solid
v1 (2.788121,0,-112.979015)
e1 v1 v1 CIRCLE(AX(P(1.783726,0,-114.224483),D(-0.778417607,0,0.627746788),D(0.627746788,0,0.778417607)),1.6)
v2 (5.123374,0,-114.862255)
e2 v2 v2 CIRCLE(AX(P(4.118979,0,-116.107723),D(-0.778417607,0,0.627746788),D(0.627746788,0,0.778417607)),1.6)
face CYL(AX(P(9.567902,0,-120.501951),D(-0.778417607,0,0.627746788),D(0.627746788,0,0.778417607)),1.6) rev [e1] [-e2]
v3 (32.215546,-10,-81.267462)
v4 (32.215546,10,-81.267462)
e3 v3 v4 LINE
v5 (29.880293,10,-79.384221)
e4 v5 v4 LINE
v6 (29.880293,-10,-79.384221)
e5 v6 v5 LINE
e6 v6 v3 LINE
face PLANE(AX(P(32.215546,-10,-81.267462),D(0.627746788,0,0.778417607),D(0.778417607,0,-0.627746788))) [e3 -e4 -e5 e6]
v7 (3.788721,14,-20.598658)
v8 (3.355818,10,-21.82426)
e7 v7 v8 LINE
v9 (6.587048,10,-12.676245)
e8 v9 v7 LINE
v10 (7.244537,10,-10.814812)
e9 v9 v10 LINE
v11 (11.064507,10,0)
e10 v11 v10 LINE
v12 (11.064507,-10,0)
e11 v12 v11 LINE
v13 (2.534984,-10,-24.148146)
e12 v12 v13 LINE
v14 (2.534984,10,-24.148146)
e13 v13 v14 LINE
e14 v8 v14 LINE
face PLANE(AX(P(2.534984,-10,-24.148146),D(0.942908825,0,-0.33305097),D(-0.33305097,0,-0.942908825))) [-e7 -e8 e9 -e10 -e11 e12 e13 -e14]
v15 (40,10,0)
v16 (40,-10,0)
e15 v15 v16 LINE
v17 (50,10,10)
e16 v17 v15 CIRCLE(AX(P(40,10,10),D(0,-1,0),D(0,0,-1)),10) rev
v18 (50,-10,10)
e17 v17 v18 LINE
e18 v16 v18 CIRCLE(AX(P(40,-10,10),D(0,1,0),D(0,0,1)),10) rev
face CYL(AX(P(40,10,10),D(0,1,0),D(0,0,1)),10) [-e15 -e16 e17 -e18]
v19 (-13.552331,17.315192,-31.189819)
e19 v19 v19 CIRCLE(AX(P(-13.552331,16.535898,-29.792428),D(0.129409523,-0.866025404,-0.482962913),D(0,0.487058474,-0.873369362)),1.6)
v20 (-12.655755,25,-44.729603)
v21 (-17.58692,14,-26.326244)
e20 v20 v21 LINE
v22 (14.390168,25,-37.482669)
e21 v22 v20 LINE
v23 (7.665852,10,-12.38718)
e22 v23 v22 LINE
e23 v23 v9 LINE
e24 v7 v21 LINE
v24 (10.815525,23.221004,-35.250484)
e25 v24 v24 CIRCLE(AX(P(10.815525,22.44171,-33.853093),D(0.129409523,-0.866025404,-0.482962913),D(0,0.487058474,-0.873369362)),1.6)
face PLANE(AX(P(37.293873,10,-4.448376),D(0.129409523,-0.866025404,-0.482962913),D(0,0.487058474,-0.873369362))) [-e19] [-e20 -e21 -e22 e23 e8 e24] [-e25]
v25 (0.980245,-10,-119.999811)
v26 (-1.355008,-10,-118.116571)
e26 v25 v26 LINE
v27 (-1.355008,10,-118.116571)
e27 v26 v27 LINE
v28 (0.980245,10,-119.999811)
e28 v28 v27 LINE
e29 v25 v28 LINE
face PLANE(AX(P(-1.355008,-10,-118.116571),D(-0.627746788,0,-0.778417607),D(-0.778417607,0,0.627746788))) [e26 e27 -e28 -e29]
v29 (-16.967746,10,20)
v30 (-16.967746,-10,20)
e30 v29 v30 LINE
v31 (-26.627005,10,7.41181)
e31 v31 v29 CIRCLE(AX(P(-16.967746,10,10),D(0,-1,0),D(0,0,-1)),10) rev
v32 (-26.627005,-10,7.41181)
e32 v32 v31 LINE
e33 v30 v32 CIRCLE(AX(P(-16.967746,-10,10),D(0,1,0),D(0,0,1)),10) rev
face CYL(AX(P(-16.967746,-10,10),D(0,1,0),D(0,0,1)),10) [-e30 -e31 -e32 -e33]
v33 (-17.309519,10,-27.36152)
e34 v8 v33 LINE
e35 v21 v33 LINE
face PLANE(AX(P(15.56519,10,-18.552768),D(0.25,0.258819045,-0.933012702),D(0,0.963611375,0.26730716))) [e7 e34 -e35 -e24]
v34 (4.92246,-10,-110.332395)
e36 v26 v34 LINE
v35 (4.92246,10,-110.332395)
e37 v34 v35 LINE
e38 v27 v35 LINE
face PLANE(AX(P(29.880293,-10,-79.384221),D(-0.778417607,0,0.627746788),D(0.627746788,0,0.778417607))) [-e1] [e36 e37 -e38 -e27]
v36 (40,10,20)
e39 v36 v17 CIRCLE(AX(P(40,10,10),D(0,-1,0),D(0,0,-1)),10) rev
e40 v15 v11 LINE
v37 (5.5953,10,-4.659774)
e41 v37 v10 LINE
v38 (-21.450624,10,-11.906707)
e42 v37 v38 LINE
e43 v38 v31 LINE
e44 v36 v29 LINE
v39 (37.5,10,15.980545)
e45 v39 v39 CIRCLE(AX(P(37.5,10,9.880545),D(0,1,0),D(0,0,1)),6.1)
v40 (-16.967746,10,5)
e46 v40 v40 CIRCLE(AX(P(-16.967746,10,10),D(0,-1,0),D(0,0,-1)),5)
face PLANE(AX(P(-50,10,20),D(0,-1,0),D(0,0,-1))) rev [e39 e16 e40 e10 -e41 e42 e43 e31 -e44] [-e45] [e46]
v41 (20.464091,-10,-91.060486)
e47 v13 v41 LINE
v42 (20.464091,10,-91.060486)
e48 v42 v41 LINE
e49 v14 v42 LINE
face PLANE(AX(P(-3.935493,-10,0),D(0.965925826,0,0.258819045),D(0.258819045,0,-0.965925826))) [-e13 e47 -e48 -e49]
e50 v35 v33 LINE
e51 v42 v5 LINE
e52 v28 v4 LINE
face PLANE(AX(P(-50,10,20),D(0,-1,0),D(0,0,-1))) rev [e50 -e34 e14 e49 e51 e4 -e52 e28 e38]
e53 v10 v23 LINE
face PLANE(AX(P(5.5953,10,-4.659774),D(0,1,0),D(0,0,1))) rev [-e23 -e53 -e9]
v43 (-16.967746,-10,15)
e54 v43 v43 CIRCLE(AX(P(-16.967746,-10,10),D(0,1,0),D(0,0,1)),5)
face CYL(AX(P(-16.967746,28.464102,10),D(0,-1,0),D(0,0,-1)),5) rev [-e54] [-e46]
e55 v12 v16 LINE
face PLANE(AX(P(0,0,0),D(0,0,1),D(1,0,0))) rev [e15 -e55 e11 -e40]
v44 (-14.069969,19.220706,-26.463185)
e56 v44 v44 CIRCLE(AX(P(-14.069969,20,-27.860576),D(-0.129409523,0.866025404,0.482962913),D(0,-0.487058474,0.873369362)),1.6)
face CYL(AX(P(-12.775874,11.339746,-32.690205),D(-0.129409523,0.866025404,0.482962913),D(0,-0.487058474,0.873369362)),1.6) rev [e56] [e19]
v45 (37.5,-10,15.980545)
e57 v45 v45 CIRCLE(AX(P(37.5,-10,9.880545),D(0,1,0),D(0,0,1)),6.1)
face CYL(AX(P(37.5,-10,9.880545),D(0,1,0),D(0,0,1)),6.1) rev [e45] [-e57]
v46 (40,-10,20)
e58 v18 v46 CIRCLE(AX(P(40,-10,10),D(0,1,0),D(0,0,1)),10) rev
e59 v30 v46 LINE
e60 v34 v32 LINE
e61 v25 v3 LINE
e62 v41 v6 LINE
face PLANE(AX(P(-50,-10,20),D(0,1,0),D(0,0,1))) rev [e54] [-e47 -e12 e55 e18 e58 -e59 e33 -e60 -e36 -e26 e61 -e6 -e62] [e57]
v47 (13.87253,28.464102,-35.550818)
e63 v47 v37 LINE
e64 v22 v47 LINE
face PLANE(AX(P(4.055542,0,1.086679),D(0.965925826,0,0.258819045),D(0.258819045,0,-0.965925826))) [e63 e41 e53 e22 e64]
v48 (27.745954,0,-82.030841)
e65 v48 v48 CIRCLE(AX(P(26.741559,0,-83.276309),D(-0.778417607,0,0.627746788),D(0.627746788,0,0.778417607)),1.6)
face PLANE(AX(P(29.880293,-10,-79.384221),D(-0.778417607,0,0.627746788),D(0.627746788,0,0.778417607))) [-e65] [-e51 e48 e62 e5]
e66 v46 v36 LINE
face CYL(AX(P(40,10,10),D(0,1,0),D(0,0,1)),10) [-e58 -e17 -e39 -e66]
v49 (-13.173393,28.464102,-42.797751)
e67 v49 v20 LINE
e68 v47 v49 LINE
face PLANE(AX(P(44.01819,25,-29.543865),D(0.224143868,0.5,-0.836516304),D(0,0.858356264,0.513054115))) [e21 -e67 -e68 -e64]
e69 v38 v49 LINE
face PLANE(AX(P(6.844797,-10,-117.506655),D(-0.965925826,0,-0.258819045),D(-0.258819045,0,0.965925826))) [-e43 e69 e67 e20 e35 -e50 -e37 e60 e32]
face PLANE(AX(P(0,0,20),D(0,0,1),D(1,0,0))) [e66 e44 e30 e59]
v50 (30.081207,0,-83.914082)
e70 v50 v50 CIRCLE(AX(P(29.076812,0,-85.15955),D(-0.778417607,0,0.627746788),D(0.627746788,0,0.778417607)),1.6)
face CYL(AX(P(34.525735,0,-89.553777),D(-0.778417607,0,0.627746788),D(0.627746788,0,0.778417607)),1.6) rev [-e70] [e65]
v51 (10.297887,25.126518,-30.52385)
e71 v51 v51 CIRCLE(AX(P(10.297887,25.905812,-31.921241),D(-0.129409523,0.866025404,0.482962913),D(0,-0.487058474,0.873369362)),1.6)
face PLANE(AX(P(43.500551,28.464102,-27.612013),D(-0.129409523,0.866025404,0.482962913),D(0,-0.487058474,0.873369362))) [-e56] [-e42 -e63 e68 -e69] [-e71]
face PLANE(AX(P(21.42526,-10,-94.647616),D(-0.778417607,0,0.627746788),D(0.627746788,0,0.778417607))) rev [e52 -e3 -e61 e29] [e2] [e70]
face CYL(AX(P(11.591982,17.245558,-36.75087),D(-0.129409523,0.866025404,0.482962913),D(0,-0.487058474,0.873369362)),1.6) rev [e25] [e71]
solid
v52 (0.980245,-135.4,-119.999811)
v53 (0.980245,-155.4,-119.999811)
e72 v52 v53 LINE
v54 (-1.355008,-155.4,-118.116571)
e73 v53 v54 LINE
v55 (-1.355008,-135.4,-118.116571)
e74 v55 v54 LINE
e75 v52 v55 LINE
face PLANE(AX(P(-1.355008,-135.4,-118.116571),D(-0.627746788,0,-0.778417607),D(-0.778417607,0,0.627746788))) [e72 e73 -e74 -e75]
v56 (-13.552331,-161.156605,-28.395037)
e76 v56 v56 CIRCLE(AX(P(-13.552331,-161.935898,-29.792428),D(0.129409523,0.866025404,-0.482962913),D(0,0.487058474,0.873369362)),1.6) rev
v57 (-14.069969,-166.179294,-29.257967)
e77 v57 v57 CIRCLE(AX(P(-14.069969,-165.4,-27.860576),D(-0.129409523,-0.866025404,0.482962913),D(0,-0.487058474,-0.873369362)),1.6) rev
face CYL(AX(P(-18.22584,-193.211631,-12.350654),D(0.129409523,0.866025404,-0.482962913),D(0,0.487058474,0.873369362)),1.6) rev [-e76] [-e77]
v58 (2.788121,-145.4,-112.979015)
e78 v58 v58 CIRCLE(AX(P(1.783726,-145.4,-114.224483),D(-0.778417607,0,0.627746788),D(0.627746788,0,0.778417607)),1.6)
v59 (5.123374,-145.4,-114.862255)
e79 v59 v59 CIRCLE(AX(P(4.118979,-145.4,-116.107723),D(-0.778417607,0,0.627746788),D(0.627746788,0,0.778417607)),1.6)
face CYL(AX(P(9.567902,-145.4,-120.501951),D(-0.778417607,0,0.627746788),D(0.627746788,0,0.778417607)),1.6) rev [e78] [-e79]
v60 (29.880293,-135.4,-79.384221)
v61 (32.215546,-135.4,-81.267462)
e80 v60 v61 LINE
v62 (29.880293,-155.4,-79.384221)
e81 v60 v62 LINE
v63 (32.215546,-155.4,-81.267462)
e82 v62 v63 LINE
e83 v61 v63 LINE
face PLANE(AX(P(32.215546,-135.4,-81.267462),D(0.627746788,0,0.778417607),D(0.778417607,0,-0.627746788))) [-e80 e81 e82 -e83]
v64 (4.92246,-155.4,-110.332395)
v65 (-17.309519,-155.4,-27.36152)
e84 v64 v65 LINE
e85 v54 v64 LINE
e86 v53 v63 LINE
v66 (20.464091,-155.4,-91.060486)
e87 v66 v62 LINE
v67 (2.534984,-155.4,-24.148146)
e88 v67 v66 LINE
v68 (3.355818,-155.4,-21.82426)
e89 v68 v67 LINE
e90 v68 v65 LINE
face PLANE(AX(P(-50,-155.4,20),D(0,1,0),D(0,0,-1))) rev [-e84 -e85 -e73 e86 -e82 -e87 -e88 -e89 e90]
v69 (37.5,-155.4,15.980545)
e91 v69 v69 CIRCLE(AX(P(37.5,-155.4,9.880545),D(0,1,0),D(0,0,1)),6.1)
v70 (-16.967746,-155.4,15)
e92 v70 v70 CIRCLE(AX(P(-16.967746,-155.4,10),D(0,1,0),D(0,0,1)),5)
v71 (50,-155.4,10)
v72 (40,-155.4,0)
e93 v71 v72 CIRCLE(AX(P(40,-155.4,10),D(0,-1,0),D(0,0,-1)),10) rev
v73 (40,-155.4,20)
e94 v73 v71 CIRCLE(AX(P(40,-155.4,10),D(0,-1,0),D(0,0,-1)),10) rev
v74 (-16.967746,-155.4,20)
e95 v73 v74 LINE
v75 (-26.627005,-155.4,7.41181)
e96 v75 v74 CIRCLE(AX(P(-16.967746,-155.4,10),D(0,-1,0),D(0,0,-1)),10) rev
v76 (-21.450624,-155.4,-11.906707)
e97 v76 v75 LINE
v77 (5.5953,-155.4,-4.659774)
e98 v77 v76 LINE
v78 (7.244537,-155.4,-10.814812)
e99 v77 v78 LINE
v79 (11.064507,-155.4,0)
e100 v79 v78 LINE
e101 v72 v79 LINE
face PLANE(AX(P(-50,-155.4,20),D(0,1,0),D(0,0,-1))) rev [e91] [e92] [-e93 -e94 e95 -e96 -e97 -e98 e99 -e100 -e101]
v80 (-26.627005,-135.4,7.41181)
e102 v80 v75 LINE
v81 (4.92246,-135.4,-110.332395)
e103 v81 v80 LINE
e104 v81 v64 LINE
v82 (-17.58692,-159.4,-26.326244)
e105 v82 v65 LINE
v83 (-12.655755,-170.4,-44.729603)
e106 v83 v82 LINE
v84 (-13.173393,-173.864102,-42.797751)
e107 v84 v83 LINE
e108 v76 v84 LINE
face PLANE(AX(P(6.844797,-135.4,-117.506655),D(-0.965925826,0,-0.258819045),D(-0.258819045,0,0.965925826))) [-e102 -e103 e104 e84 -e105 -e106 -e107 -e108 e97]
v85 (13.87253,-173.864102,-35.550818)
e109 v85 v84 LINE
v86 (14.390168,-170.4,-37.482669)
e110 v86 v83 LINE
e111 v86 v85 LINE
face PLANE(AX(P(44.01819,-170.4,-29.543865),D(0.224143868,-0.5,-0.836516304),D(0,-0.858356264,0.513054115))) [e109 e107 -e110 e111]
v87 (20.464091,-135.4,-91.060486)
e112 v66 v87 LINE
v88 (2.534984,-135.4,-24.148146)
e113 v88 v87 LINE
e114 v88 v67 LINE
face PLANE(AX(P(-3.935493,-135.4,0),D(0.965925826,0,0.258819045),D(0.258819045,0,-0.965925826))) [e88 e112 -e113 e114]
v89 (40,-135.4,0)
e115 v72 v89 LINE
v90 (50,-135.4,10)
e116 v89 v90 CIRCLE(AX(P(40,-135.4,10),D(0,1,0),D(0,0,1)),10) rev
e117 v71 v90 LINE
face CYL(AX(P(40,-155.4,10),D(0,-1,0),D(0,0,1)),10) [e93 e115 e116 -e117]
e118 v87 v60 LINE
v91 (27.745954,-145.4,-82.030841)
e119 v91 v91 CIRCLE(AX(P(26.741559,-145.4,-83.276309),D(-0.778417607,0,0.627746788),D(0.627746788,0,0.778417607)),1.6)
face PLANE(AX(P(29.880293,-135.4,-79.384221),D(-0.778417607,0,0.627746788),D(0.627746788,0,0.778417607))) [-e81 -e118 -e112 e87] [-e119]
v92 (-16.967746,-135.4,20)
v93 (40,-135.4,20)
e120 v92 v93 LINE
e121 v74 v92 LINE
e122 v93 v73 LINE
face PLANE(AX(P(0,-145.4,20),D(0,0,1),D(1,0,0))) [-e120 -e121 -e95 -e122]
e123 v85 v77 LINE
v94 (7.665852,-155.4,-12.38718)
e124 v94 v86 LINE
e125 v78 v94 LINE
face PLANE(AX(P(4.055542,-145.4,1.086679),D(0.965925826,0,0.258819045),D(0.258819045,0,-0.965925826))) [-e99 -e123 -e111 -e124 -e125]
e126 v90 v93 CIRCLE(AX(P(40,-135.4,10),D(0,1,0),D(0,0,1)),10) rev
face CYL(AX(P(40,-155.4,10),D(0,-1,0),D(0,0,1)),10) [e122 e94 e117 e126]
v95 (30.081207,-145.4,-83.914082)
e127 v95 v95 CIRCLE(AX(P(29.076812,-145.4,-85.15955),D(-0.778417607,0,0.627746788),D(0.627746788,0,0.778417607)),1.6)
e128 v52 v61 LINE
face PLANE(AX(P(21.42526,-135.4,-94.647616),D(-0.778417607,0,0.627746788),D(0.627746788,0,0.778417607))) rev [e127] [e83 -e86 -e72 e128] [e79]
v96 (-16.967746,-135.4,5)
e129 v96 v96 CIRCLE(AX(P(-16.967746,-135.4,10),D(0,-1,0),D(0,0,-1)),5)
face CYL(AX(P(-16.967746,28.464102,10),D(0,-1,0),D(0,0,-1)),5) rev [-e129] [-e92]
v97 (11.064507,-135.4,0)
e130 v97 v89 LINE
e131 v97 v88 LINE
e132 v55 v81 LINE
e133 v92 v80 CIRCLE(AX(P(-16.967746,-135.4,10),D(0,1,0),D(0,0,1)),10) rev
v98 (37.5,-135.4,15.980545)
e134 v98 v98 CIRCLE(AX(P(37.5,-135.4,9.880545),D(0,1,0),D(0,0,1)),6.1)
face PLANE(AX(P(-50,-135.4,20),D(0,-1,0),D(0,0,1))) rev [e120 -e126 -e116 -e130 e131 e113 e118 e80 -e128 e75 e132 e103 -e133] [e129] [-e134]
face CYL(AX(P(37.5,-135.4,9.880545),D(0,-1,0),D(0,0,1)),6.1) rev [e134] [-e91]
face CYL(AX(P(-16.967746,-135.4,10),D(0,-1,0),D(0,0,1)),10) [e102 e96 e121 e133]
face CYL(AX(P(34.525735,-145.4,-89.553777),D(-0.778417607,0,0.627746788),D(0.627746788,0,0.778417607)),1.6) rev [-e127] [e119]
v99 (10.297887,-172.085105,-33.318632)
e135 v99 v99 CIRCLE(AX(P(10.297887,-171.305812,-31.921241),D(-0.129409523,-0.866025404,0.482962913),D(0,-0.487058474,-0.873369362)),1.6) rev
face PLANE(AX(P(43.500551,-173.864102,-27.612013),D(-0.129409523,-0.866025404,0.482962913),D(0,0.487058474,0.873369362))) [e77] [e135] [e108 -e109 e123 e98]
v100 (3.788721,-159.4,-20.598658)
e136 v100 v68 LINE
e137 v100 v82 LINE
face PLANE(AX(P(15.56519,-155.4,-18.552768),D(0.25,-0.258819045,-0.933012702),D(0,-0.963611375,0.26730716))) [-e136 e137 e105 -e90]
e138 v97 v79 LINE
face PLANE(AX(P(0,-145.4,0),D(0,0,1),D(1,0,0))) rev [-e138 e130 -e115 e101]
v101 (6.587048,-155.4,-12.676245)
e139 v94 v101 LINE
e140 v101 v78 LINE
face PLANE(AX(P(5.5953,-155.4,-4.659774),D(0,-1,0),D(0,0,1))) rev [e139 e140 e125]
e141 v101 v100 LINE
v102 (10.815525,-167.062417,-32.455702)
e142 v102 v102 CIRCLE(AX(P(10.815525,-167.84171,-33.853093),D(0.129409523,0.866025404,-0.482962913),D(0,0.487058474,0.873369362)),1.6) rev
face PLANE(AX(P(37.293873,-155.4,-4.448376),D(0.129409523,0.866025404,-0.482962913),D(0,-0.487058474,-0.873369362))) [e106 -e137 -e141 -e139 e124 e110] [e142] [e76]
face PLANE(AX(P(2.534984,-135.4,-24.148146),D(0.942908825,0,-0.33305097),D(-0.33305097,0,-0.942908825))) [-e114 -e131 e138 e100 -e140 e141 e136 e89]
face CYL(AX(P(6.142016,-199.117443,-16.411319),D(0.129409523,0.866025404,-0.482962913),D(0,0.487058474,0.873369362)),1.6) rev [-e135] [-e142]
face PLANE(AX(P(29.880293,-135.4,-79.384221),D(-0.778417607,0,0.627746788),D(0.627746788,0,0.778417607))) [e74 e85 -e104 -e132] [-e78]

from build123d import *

# Parameters (mm, degrees)
SKETCH_1_W               = 100
SKETCH_1_H               = 20
EXTRUDE_1_DEPTH          = 20
SKETCH_2_R               = 6.1
CUT_EXTRUDE_1_DEPTH      = 58.445626465
FILLET_1_R               = 10
FILLET_2_R               = 10
SKETCH_4_W               = 20
SKETCH_4_H               = 20
CUT_EXTRUDE_2_DEPTH      = 20
EXTRUDE_2_DEPTH          = 20
CUT_EXTRUDE_3_DEPTH      = 130.258709652
CUT_EXTRUDE_4_DEPTH      = 130.258709652
EXTRUDE_3_DEPTH          = 20
EXTRUDE_4_DEPTH          = 20
FILLET_3_R               = 10
EXTRUDE_5_DEPTH          = 20
EXTRUDE_6_DEPTH          = 8
EXTRUDE_7_REACH          = 140.193
CUT_EXTRUDE_5_DEPTH      = 210.16834973
CUT_EXTRUDE_5_DEPTH_BACK = 210.16834973
SKETCH_15_R              = 5
CUT_EXTRUDE_6_DEPTH      = 242.818562796
CUT_EXTRUDE_6_DEPTH_BACK = 10
SKETCH_16_R              = 1.6
SKETCH_18_R              = 1.6
CUT_EXTRUDE_7_DEPTH      = 10
SKETCH_19_R              = 1.6
CUT_EXTRUDE_8_DEPTH      = 10
SKETCH_20_R              = 1.6
CUT_EXTRUDE_9_DEPTH      = 10


with BuildPart() as part:
    # 草图1 → 凸台-拉伸1 (new body)
    with BuildSketch(Plane.XY):
        Rectangle(SKETCH_1_W, SKETCH_1_H)
    extrude(amount=EXTRUDE_1_DEPTH)

    # 草图2 → 切除-拉伸1 (cut, through all)
    with BuildSketch(Plane(origin=(0, 10, 0), x_dir=(1, 0, 0), z_dir=(0, 1, 0))):
        with Locations(Location((37.5, -9.880544607, 0), (0, 0, 270))):
            Circle(SKETCH_2_R)
    extrude(amount=-CUT_EXTRUDE_1_DEPTH, mode=Mode.SUBTRACT)

    # 圆角1
    fillet_1_edges = [part.edges().sort_by_distance(p)[0] for p in [
        (50, 0, 20),
    ]]
    fillet(fillet_1_edges, radius=FILLET_1_R)

    # 圆角2
    fillet_2_edges = [part.edges().sort_by_distance(p)[0] for p in [
        (50, 0, 0),
    ]]
    fillet(fillet_2_edges, radius=FILLET_2_R - 0.0001)  # a hair under: the kernel refuses the full size

    # 草图4 → 切除-拉伸2 (cut)
    with BuildSketch(Plane.ZY.offset(50)):
        with Locations((10, 0)):
            Rectangle(SKETCH_4_W, SKETCH_4_H)
    extrude(amount=-CUT_EXTRUDE_2_DEPTH, mode=Mode.SUBTRACT)

    # 草图6 → 凸台-拉伸2 (add)
    with BuildSketch(Plane(origin=(0, 10, 0), x_dir=(1, 0, 0), z_dir=(0, 1, 0))):
        Polygon((-3.935492543, 0), (22.386428262, 98.234745796), (6.84479722, 117.50665522), (-30, -20), align=None)
    extrude(amount=-EXTRUDE_2_DEPTH)

    # 草图7 → 切除-拉伸3 (cut, through all)
    with BuildSketch(Plane(origin=(0, 10, 0), x_dir=(1, 0, 0), z_dir=(0, 1, 0))):
        Polygon((-24.641016151, 0), (-30, -20), (-30, 0), align=None)
    extrude(amount=-CUT_EXTRUDE_3_DEPTH, mode=Mode.SUBTRACT)

    # 草图9 → 切除-拉伸4 (cut, through all)
    with BuildSketch(Plane(origin=(0, 10, 0), x_dir=(1, 0, 0), z_dir=(0, 1, 0))):
        Polygon((6.84479722, 117.50665522), (22.386428262, 98.234745796), (21.425259639, 94.64761566), (5.883628597, 113.919525084), align=None)
    extrude(amount=-CUT_EXTRUDE_4_DEPTH, mode=Mode.SUBTRACT)

    # 草图10 → 凸台-拉伸3 (add, through all)
    with BuildSketch(Plane(origin=(0, 10, 0), x_dir=(1, 0, 0), z_dir=(0, 1, 0))):
        Polygon((11.064507457, 0), (-3.935492543, 0), (2.534983584, 24.148145657), align=None)
    extrude(amount=-EXTRUDE_3_DEPTH)

    # 草图11 → 凸台-拉伸4 (add, through all)
    with BuildSketch(Plane(origin=(0, 10, 0), x_dir=(1, 0, 0), z_dir=(0, 1, 0))):
        Polygon((0.980244914, 119.999811377), (32.215545654, 81.267461789), (29.880292834, 79.384221425), (-1.355007905, 118.116571014), align=None)
    extrude(amount=-EXTRUDE_4_DEPTH)

    # 圆角3
    fillet_3_edges = [part.edges().sort_by_distance(p)[0] for p in [
        (-30, 0, 20),
    ]]
    fillet(fillet_3_edges, radius=FILLET_3_R)

    # 草图12 → 凸台-拉伸5 (add)
    with BuildSketch(Plane(origin=(-22.990381057, 0, -6.160254038), x_dir=(-0.2588190451025246, 0, 0.9659258262890673), z_dir=(-0.9659258262890673, 0, -0.2588190451025246))):
        Polygon((-5.94916585, 10), (-13.94916585, 10), (-39.929927963, 25), (-37.929927963, 28.464101615), align=None)
    extrude(amount=-EXTRUDE_5_DEPTH)

    # 草图13 → 凸台-拉伸6 (add)
    with BuildSketch(Plane(origin=(-3.671864531, 0, -0.983873136), x_dir=(0.2588190451025246, 0, -0.9659258262890672), z_dir=(0.9659258262890673, 0, 0.2588190451025247))):
        Polygon((37.929927963, 28.464101615), (5.94916585, 10), (13.94916585, 10), (39.929927963, 25), align=None)
    extrude(amount=EXTRUDE_6_DEPTH)

    # 凸台-拉伸7: up to this plane
    extrude_7_end = Plane(origin=(2.534983584, -10, -24.148145657), z_dir=(0.9429088246168765, 0, -0.33305096976231796))
    # 草图14 → 凸台-拉伸7 (add, up to the surface)
    with BuildSketch(Plane(origin=(-22.990381057, 0, -6.160254038), x_dir=(-0.2588190451025246, 0, 0.9659258262890673), z_dir=(-0.9659258262890673, 0, -0.2588190451025246)), mode=Mode.PRIVATE) as extrude_7_sk1:
        Polygon((-20.87736908, 14), (-13.94916585, 10), (-21.94916585, 10), align=None)
    extrude_7_tool1 = split(extrude(extrude_7_sk1.sketch, amount=-EXTRUDE_7_REACH, mode=Mode.PRIVATE), bisect_by=extrude_7_end, keep=Keep.BOTH, mode=Mode.PRIVATE)
    add(extrude_7_tool1.solids().sort_by_distance((-18.09217, 11.333333, -24.440626))[0])


with BuildPart() as body_2:
    # 镜向1: mirrored copy
    add(part.part.mirror(Plane(origin=(0, -72.7, 0), x_dir=(0, 0, 1), z_dir=(0, -1, 0))))


with BuildPart() as cut_extrude_5_tool:
    # 草图15 → 切除-拉伸5 (new, two sides: drawn at the far end of the back side and taken through both)
    with BuildSketch(Plane.XZ.offset(10).offset(-CUT_EXTRUDE_5_DEPTH_BACK)):
        with Locations(Location((-16.967746272, 10, 0), (0, 0, 270))):
            Circle(SKETCH_15_R)
    extrude(amount=CUT_EXTRUDE_5_DEPTH + CUT_EXTRUDE_5_DEPTH_BACK)


with BuildPart() as part_1:
    add(part.part)

    # 切除-拉伸5: cut by cut_extrude_5_tool
    add(cut_extrude_5_tool.part, mode=Mode.SUBTRACT)

    # 草图18 → 切除-拉伸7 (cut)
    with BuildSketch(Plane(origin=(-0.735779984, 4.923935621, 2.745968284), x_dir=(0.9915912340642462, 0.11302231218972869, 0.06303000455523398), z_dir=(-0.12940952255126095, 0.8660254037844418, 0.4829629131445286))):
        with Locations(Location((-13.447263702, 34.073742899, 0), (0, 0, 270))):
            Circle(SKETCH_18_R)
        with Locations(Location((11.127233063, 40.496679047, 0), (0, 0, 270))):
            Circle(SKETCH_18_R)
    extrude(amount=-CUT_EXTRUDE_7_DEPTH, mode=Mode.SUBTRACT)

    # 草图19 → 切除-拉伸8 (cut)
    with BuildSketch(Plane(origin=(56.896516967, 0, -45.883604723), x_dir=(0.6277467879246018, 0, 0.7784176065906688), z_dir=(-0.7784176065906688, 0, 0.6277467879246018))):
        with Locations((-87.794620367, 0)):
            Circle(SKETCH_19_R)
        with Locations((-48.036817794, 0)):
            Circle(SKETCH_19_R)
    extrude(amount=-CUT_EXTRUDE_8_DEPTH, mode=Mode.SUBTRACT)


with BuildPart() as body_2_1:
    add(body_2.part)

    # 切除-拉伸5: cut by cut_extrude_5_tool
    add(cut_extrude_5_tool.part, mode=Mode.SUBTRACT)

    # 草图16 → 切除-拉伸6 (cut, two sides: drawn at the far end of the back side and taken through both)
    with BuildSketch(Plane(origin=(-17.031039191, -113.973935621, 63.560703566), x_dir=(0.9915912340642462, -0.11302231218972869, 0.06303000455523398), z_dir=(-0.12940952255126095, -0.8660254037844418, 0.4829629131445286)).offset(-CUT_EXTRUDE_6_DEPTH_BACK)):
        with Locations(Location((2.986180491, -104.892044997, 0), (0, 0, 90))):
            Circle(SKETCH_16_R)
        with Locations(Location((27.560677255, -111.314981145, 0), (0, 0, 90))):
            Circle(SKETCH_16_R)
    extrude(amount=CUT_EXTRUDE_6_DEPTH + CUT_EXTRUDE_6_DEPTH_BACK, mode=Mode.SUBTRACT)

    # 草图20 → 切除-拉伸9 (cut)
    with BuildSketch(Plane(origin=(56.896516967, 0, -45.883604723), x_dir=(0.6277467879246018, 0, 0.7784176065906688), z_dir=(-0.7784176065906688, 0, 0.6277467879246018))):
        with Locations((-87.794620367, -145.4)):
            Circle(SKETCH_20_R)
        with Locations((-48.036817794, -145.4)):
            Circle(SKETCH_20_R)
    extrude(amount=-CUT_EXTRUDE_9_DEPTH, mode=Mode.SUBTRACT)


solid = Compound([part_1.part, body_2_1.part])
